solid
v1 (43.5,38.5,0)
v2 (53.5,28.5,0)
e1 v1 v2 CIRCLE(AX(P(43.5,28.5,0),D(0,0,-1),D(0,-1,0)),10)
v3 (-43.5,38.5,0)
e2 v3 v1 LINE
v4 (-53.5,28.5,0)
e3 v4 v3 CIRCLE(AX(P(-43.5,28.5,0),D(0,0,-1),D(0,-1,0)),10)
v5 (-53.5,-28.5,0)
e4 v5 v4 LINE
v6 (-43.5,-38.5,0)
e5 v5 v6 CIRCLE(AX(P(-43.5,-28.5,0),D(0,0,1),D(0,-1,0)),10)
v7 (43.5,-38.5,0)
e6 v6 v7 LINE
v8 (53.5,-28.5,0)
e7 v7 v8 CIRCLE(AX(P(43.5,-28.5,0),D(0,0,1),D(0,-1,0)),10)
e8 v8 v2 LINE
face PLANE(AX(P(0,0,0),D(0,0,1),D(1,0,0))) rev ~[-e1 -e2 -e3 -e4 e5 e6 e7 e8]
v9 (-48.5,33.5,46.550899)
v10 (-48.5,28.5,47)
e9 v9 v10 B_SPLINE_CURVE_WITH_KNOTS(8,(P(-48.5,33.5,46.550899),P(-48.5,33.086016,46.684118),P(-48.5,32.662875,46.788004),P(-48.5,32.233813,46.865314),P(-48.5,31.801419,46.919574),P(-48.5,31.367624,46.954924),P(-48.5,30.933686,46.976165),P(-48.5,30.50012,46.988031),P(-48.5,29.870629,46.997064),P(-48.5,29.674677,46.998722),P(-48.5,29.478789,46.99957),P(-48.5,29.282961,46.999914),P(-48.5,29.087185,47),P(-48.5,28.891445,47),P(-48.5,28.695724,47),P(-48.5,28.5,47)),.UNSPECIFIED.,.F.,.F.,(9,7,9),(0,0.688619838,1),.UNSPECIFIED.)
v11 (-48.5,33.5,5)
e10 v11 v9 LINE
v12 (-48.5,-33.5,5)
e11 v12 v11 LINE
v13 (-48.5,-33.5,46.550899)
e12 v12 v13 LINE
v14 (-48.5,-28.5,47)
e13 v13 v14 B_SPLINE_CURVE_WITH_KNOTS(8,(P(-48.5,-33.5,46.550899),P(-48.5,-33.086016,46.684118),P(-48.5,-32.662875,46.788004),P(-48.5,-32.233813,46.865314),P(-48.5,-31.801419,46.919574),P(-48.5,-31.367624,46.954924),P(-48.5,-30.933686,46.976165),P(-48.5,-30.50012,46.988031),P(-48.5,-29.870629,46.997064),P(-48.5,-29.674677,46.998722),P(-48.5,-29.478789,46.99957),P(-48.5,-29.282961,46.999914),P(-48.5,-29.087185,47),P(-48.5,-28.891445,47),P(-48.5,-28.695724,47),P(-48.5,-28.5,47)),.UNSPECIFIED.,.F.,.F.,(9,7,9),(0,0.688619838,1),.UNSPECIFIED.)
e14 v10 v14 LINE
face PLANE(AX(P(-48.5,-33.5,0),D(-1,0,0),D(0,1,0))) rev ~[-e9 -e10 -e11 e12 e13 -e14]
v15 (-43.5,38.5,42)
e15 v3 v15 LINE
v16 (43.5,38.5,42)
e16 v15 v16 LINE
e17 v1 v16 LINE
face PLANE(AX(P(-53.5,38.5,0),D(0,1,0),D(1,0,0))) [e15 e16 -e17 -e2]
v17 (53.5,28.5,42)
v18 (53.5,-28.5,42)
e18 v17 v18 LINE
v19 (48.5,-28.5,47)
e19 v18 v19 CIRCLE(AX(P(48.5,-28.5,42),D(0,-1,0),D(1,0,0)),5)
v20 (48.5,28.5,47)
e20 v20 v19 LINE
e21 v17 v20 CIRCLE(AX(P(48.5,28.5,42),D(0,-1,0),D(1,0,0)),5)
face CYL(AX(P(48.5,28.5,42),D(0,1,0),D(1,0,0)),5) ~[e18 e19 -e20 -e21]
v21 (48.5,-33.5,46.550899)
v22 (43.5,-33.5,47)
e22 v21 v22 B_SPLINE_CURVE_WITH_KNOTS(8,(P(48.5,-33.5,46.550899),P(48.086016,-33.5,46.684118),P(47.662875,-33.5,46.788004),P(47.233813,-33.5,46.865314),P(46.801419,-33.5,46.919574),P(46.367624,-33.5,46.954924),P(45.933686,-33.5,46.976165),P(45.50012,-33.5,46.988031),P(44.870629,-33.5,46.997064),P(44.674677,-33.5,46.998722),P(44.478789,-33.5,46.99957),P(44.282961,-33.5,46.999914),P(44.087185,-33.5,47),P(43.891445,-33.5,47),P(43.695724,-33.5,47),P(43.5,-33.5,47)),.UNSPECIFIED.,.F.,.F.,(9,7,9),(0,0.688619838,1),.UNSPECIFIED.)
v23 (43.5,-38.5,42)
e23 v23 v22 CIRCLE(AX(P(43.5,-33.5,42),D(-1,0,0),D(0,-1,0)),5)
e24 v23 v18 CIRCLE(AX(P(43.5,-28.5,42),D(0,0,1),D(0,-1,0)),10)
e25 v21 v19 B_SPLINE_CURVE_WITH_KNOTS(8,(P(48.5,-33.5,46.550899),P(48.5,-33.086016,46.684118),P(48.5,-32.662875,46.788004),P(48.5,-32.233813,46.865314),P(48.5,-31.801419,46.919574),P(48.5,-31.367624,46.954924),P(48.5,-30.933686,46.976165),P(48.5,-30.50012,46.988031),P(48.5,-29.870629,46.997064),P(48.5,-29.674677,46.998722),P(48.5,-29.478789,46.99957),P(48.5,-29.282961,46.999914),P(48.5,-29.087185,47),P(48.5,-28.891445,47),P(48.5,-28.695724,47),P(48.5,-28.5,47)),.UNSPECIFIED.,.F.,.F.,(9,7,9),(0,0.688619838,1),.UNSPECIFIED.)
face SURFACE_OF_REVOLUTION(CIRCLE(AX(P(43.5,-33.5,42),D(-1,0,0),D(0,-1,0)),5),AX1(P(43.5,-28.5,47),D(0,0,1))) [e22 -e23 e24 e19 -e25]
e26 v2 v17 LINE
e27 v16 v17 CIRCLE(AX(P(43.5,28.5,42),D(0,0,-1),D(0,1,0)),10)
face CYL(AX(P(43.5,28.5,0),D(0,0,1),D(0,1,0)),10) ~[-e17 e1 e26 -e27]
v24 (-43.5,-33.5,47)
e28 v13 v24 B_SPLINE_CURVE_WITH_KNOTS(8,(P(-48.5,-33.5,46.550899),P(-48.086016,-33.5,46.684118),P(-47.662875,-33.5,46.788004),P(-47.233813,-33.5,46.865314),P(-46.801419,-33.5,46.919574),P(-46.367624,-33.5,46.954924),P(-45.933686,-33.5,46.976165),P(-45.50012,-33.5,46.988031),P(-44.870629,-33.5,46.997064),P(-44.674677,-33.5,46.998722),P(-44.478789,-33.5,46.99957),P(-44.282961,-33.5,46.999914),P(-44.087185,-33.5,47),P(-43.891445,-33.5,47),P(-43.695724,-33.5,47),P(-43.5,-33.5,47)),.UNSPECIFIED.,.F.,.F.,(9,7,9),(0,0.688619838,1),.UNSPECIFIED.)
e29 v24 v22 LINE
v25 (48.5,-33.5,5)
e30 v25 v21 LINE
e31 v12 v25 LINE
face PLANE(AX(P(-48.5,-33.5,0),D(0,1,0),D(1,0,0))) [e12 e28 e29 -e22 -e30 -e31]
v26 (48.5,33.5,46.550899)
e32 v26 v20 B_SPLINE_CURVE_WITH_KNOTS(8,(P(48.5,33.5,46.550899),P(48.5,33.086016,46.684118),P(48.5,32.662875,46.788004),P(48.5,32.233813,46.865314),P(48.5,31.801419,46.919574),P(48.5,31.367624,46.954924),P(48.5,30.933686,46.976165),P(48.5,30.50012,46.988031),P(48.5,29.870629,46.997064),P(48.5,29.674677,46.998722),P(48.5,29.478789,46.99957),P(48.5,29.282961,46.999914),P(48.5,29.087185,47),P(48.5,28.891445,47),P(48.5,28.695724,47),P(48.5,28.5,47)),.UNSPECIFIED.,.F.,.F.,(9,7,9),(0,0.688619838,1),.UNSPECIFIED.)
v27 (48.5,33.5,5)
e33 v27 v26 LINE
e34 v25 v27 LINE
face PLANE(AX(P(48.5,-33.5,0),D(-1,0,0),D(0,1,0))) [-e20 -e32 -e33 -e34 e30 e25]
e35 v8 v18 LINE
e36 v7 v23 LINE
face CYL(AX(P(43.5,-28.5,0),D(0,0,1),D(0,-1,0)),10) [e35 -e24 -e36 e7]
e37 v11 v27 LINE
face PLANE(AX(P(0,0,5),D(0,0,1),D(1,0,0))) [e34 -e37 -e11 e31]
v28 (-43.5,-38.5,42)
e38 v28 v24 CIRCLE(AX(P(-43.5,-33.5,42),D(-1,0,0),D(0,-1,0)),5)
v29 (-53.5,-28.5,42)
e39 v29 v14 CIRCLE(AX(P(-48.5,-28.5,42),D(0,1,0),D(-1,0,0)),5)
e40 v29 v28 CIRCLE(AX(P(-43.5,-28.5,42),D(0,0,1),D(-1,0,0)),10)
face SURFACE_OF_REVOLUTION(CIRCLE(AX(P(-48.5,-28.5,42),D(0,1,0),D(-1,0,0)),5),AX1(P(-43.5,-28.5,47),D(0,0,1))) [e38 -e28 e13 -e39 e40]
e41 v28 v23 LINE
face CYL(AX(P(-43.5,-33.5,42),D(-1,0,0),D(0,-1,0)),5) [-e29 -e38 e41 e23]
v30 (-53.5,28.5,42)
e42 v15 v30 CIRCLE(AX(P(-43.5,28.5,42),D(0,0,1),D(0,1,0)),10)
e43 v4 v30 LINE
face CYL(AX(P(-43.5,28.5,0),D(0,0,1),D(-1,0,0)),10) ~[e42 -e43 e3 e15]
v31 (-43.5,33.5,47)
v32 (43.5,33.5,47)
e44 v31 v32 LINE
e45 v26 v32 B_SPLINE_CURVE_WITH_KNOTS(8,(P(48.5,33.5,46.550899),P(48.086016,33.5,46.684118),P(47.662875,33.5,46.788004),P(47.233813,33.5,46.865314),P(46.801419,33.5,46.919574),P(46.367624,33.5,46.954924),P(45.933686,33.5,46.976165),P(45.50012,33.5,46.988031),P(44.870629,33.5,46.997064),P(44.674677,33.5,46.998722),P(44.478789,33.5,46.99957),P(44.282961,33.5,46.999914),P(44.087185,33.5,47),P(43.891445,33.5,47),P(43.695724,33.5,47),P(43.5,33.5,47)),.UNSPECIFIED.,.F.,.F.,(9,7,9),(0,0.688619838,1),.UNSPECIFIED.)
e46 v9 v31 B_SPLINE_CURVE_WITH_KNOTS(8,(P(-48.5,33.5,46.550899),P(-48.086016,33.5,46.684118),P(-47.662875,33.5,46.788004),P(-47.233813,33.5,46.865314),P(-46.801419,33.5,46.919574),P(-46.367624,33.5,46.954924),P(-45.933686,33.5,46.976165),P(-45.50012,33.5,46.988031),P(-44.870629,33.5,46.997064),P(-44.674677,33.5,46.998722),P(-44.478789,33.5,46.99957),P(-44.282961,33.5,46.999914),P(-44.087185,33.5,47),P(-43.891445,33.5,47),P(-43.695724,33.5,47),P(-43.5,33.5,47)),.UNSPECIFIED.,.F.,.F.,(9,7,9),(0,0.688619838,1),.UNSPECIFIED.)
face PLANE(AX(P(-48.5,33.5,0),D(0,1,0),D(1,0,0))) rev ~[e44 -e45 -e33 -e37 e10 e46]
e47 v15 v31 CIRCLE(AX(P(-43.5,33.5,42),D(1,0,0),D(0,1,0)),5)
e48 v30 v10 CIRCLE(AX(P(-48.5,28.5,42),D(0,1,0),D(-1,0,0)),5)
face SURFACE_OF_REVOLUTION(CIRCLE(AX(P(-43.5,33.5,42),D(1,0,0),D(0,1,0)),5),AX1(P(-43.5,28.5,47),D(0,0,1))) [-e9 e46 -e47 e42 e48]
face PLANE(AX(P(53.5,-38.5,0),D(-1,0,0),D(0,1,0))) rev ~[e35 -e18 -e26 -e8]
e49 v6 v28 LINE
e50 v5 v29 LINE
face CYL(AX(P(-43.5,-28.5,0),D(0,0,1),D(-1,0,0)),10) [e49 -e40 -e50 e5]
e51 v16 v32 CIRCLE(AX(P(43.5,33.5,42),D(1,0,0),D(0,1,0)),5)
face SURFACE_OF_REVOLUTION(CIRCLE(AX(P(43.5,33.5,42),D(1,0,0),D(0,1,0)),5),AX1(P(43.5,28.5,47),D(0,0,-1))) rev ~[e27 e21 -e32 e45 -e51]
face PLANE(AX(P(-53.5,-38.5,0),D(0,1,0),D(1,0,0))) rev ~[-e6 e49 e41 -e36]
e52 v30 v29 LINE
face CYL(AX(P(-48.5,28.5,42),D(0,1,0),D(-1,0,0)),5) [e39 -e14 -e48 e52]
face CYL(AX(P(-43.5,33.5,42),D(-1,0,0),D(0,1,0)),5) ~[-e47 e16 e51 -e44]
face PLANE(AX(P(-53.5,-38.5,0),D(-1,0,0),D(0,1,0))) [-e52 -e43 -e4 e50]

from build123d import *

# Parameters (mm, degrees)
F0_W         = 97
F0_H         = 67
F1_DEPTH     = 5
F0_W_2       = 107
F0_H_2       = 77
F2_DEPTH     = 47
F3_R         = 10
F4_T1_DEPTH  = 87
F4_T3_DEPTH  = 57
F4_T6_ANGLE  = 90
F4_T8_ANGLE  = 90
F4_T10_ANGLE = 90
F4_T12_ANGLE = 90


# Not quite as in the source:
# - a fillet or chamfer that OpenCascade refuses, or shapes differently, is made with other operations: its cross-section is extruded or revolved along the edge and cut away or added


with BuildPart() as f1:
    # F0 (on Top) → F1 (new body)
    with BuildSketch(Plane.XY):
        Rectangle(F0_W, F0_H)
    extrude(amount=F1_DEPTH)

    # F0 (on Top) → F2 (join)
    with BuildSketch(Plane.XY):
        Rectangle(F0_W_2, F0_H_2)
        Rectangle(F0_W, F0_H, mode=Mode.SUBTRACT)
    extrude(amount=F2_DEPTH)

    # F3
    f3_edges = [f1.edges().sort_by_distance(p)[0] for p in [
        (-53.5, 38.5, 23.5),
        (53.5, 38.5, 23.5),
        (53.5, -38.5, 23.5),
        (-53.5, -38.5, 23.5),
    ]]
    fillet(f3_edges, radius=F3_R)

    # F4: fillet of radius 5 on 8 edges, made by hand

    # F4_s2 → F4_t1 (cut)
    with BuildSketch(Plane.YZ.offset(-43.5)):
        with BuildLine():
            ThreePointArc((-38.5, 42), (-37.0355339059, 45.5355339059), (-33.5, 47))
            Line((-33.5, 47), (-38.5, 47))
            Line((-38.5, 47), (-38.5, 42))
        make_face()
        with BuildLine():
            ThreePointArc((38.5, 42), (37.0355339059, 45.5355339059), (33.5, 47))
            Line((33.5, 47), (38.5, 47))
            Line((38.5, 47), (38.5, 42))
        make_face()
    extrude(amount=F4_T1_DEPTH, mode=Mode.SUBTRACT)

    # F4_s4 → F4_t3 (cut)
    with BuildSketch(Plane.XZ.offset(-28.5)):
        with BuildLine():
            ThreePointArc((53.5, 42), (52.0355339059, 45.5355339059), (48.5, 47))
            Line((48.5, 47), (53.5, 47))
            Line((53.5, 47), (53.5, 42))
        make_face()
        with BuildLine():
            ThreePointArc((-53.5, 42), (-52.0355339059, 45.5355339059), (-48.5, 47))
            Line((-48.5, 47), (-53.5, 47))
            Line((-53.5, 47), (-53.5, 42))
        make_face()
    extrude(amount=F4_T3_DEPTH, mode=Mode.SUBTRACT)

    # F4_s5 → F4_t6 (revolve, cut)
    with BuildSketch(Plane.YZ.offset(43.5)):
        with BuildLine():
            ThreePointArc((38.5, 42), (37.0355339059, 45.5355339059), (33.5, 47))
            Line((33.5, 47), (38.5, 47))
            Line((38.5, 47), (38.5, 42))
        make_face()
    revolve(axis=Axis((43.5, 28.5, 47), (0, 0, -1)), revolution_arc=F4_T6_ANGLE, mode=Mode.SUBTRACT)

    # F4_s7 → F4_t8 (revolve, cut)
    with BuildSketch(Plane.YZ.offset(-43.5)):
        with BuildLine():
            ThreePointArc((38.5, 42), (37.0355339059, 45.5355339059), (33.5, 47))
            Line((33.5, 47), (38.5, 47))
            Line((38.5, 47), (38.5, 42))
        make_face()
    revolve(axis=Axis((-43.5, 28.5, 47), (0, 0, 1)), revolution_arc=F4_T8_ANGLE, mode=Mode.SUBTRACT)

    # F4_s9 → F4_t10 (revolve, cut)
    with BuildSketch(Plane.YZ.offset(43.5)):
        with BuildLine():
            ThreePointArc((-38.5, 42), (-37.0355339059, 45.5355339059), (-33.5, 47))
            Line((-33.5, 47), (-38.5, 47))
            Line((-38.5, 47), (-38.5, 42))
        make_face()
    revolve(axis=Axis((43.5, -28.5, 47), (0, 0, 1)), revolution_arc=F4_T10_ANGLE, mode=Mode.SUBTRACT)

    # F4_s11 → F4_t12 (revolve, cut)
    with BuildSketch(Plane.XZ.offset(28.5)):
        with BuildLine():
            ThreePointArc((-53.5, 42), (-52.0355339059, 45.5355339059), (-48.5, 47))
            Line((-48.5, 47), (-53.5, 47))
            Line((-53.5, 47), (-53.5, 42))
        make_face()
    revolve(axis=Axis((-43.5, -28.5, 47), (0, 0, 1)), revolution_arc=F4_T12_ANGLE, mode=Mode.SUBTRACT)


solid = f1.part
